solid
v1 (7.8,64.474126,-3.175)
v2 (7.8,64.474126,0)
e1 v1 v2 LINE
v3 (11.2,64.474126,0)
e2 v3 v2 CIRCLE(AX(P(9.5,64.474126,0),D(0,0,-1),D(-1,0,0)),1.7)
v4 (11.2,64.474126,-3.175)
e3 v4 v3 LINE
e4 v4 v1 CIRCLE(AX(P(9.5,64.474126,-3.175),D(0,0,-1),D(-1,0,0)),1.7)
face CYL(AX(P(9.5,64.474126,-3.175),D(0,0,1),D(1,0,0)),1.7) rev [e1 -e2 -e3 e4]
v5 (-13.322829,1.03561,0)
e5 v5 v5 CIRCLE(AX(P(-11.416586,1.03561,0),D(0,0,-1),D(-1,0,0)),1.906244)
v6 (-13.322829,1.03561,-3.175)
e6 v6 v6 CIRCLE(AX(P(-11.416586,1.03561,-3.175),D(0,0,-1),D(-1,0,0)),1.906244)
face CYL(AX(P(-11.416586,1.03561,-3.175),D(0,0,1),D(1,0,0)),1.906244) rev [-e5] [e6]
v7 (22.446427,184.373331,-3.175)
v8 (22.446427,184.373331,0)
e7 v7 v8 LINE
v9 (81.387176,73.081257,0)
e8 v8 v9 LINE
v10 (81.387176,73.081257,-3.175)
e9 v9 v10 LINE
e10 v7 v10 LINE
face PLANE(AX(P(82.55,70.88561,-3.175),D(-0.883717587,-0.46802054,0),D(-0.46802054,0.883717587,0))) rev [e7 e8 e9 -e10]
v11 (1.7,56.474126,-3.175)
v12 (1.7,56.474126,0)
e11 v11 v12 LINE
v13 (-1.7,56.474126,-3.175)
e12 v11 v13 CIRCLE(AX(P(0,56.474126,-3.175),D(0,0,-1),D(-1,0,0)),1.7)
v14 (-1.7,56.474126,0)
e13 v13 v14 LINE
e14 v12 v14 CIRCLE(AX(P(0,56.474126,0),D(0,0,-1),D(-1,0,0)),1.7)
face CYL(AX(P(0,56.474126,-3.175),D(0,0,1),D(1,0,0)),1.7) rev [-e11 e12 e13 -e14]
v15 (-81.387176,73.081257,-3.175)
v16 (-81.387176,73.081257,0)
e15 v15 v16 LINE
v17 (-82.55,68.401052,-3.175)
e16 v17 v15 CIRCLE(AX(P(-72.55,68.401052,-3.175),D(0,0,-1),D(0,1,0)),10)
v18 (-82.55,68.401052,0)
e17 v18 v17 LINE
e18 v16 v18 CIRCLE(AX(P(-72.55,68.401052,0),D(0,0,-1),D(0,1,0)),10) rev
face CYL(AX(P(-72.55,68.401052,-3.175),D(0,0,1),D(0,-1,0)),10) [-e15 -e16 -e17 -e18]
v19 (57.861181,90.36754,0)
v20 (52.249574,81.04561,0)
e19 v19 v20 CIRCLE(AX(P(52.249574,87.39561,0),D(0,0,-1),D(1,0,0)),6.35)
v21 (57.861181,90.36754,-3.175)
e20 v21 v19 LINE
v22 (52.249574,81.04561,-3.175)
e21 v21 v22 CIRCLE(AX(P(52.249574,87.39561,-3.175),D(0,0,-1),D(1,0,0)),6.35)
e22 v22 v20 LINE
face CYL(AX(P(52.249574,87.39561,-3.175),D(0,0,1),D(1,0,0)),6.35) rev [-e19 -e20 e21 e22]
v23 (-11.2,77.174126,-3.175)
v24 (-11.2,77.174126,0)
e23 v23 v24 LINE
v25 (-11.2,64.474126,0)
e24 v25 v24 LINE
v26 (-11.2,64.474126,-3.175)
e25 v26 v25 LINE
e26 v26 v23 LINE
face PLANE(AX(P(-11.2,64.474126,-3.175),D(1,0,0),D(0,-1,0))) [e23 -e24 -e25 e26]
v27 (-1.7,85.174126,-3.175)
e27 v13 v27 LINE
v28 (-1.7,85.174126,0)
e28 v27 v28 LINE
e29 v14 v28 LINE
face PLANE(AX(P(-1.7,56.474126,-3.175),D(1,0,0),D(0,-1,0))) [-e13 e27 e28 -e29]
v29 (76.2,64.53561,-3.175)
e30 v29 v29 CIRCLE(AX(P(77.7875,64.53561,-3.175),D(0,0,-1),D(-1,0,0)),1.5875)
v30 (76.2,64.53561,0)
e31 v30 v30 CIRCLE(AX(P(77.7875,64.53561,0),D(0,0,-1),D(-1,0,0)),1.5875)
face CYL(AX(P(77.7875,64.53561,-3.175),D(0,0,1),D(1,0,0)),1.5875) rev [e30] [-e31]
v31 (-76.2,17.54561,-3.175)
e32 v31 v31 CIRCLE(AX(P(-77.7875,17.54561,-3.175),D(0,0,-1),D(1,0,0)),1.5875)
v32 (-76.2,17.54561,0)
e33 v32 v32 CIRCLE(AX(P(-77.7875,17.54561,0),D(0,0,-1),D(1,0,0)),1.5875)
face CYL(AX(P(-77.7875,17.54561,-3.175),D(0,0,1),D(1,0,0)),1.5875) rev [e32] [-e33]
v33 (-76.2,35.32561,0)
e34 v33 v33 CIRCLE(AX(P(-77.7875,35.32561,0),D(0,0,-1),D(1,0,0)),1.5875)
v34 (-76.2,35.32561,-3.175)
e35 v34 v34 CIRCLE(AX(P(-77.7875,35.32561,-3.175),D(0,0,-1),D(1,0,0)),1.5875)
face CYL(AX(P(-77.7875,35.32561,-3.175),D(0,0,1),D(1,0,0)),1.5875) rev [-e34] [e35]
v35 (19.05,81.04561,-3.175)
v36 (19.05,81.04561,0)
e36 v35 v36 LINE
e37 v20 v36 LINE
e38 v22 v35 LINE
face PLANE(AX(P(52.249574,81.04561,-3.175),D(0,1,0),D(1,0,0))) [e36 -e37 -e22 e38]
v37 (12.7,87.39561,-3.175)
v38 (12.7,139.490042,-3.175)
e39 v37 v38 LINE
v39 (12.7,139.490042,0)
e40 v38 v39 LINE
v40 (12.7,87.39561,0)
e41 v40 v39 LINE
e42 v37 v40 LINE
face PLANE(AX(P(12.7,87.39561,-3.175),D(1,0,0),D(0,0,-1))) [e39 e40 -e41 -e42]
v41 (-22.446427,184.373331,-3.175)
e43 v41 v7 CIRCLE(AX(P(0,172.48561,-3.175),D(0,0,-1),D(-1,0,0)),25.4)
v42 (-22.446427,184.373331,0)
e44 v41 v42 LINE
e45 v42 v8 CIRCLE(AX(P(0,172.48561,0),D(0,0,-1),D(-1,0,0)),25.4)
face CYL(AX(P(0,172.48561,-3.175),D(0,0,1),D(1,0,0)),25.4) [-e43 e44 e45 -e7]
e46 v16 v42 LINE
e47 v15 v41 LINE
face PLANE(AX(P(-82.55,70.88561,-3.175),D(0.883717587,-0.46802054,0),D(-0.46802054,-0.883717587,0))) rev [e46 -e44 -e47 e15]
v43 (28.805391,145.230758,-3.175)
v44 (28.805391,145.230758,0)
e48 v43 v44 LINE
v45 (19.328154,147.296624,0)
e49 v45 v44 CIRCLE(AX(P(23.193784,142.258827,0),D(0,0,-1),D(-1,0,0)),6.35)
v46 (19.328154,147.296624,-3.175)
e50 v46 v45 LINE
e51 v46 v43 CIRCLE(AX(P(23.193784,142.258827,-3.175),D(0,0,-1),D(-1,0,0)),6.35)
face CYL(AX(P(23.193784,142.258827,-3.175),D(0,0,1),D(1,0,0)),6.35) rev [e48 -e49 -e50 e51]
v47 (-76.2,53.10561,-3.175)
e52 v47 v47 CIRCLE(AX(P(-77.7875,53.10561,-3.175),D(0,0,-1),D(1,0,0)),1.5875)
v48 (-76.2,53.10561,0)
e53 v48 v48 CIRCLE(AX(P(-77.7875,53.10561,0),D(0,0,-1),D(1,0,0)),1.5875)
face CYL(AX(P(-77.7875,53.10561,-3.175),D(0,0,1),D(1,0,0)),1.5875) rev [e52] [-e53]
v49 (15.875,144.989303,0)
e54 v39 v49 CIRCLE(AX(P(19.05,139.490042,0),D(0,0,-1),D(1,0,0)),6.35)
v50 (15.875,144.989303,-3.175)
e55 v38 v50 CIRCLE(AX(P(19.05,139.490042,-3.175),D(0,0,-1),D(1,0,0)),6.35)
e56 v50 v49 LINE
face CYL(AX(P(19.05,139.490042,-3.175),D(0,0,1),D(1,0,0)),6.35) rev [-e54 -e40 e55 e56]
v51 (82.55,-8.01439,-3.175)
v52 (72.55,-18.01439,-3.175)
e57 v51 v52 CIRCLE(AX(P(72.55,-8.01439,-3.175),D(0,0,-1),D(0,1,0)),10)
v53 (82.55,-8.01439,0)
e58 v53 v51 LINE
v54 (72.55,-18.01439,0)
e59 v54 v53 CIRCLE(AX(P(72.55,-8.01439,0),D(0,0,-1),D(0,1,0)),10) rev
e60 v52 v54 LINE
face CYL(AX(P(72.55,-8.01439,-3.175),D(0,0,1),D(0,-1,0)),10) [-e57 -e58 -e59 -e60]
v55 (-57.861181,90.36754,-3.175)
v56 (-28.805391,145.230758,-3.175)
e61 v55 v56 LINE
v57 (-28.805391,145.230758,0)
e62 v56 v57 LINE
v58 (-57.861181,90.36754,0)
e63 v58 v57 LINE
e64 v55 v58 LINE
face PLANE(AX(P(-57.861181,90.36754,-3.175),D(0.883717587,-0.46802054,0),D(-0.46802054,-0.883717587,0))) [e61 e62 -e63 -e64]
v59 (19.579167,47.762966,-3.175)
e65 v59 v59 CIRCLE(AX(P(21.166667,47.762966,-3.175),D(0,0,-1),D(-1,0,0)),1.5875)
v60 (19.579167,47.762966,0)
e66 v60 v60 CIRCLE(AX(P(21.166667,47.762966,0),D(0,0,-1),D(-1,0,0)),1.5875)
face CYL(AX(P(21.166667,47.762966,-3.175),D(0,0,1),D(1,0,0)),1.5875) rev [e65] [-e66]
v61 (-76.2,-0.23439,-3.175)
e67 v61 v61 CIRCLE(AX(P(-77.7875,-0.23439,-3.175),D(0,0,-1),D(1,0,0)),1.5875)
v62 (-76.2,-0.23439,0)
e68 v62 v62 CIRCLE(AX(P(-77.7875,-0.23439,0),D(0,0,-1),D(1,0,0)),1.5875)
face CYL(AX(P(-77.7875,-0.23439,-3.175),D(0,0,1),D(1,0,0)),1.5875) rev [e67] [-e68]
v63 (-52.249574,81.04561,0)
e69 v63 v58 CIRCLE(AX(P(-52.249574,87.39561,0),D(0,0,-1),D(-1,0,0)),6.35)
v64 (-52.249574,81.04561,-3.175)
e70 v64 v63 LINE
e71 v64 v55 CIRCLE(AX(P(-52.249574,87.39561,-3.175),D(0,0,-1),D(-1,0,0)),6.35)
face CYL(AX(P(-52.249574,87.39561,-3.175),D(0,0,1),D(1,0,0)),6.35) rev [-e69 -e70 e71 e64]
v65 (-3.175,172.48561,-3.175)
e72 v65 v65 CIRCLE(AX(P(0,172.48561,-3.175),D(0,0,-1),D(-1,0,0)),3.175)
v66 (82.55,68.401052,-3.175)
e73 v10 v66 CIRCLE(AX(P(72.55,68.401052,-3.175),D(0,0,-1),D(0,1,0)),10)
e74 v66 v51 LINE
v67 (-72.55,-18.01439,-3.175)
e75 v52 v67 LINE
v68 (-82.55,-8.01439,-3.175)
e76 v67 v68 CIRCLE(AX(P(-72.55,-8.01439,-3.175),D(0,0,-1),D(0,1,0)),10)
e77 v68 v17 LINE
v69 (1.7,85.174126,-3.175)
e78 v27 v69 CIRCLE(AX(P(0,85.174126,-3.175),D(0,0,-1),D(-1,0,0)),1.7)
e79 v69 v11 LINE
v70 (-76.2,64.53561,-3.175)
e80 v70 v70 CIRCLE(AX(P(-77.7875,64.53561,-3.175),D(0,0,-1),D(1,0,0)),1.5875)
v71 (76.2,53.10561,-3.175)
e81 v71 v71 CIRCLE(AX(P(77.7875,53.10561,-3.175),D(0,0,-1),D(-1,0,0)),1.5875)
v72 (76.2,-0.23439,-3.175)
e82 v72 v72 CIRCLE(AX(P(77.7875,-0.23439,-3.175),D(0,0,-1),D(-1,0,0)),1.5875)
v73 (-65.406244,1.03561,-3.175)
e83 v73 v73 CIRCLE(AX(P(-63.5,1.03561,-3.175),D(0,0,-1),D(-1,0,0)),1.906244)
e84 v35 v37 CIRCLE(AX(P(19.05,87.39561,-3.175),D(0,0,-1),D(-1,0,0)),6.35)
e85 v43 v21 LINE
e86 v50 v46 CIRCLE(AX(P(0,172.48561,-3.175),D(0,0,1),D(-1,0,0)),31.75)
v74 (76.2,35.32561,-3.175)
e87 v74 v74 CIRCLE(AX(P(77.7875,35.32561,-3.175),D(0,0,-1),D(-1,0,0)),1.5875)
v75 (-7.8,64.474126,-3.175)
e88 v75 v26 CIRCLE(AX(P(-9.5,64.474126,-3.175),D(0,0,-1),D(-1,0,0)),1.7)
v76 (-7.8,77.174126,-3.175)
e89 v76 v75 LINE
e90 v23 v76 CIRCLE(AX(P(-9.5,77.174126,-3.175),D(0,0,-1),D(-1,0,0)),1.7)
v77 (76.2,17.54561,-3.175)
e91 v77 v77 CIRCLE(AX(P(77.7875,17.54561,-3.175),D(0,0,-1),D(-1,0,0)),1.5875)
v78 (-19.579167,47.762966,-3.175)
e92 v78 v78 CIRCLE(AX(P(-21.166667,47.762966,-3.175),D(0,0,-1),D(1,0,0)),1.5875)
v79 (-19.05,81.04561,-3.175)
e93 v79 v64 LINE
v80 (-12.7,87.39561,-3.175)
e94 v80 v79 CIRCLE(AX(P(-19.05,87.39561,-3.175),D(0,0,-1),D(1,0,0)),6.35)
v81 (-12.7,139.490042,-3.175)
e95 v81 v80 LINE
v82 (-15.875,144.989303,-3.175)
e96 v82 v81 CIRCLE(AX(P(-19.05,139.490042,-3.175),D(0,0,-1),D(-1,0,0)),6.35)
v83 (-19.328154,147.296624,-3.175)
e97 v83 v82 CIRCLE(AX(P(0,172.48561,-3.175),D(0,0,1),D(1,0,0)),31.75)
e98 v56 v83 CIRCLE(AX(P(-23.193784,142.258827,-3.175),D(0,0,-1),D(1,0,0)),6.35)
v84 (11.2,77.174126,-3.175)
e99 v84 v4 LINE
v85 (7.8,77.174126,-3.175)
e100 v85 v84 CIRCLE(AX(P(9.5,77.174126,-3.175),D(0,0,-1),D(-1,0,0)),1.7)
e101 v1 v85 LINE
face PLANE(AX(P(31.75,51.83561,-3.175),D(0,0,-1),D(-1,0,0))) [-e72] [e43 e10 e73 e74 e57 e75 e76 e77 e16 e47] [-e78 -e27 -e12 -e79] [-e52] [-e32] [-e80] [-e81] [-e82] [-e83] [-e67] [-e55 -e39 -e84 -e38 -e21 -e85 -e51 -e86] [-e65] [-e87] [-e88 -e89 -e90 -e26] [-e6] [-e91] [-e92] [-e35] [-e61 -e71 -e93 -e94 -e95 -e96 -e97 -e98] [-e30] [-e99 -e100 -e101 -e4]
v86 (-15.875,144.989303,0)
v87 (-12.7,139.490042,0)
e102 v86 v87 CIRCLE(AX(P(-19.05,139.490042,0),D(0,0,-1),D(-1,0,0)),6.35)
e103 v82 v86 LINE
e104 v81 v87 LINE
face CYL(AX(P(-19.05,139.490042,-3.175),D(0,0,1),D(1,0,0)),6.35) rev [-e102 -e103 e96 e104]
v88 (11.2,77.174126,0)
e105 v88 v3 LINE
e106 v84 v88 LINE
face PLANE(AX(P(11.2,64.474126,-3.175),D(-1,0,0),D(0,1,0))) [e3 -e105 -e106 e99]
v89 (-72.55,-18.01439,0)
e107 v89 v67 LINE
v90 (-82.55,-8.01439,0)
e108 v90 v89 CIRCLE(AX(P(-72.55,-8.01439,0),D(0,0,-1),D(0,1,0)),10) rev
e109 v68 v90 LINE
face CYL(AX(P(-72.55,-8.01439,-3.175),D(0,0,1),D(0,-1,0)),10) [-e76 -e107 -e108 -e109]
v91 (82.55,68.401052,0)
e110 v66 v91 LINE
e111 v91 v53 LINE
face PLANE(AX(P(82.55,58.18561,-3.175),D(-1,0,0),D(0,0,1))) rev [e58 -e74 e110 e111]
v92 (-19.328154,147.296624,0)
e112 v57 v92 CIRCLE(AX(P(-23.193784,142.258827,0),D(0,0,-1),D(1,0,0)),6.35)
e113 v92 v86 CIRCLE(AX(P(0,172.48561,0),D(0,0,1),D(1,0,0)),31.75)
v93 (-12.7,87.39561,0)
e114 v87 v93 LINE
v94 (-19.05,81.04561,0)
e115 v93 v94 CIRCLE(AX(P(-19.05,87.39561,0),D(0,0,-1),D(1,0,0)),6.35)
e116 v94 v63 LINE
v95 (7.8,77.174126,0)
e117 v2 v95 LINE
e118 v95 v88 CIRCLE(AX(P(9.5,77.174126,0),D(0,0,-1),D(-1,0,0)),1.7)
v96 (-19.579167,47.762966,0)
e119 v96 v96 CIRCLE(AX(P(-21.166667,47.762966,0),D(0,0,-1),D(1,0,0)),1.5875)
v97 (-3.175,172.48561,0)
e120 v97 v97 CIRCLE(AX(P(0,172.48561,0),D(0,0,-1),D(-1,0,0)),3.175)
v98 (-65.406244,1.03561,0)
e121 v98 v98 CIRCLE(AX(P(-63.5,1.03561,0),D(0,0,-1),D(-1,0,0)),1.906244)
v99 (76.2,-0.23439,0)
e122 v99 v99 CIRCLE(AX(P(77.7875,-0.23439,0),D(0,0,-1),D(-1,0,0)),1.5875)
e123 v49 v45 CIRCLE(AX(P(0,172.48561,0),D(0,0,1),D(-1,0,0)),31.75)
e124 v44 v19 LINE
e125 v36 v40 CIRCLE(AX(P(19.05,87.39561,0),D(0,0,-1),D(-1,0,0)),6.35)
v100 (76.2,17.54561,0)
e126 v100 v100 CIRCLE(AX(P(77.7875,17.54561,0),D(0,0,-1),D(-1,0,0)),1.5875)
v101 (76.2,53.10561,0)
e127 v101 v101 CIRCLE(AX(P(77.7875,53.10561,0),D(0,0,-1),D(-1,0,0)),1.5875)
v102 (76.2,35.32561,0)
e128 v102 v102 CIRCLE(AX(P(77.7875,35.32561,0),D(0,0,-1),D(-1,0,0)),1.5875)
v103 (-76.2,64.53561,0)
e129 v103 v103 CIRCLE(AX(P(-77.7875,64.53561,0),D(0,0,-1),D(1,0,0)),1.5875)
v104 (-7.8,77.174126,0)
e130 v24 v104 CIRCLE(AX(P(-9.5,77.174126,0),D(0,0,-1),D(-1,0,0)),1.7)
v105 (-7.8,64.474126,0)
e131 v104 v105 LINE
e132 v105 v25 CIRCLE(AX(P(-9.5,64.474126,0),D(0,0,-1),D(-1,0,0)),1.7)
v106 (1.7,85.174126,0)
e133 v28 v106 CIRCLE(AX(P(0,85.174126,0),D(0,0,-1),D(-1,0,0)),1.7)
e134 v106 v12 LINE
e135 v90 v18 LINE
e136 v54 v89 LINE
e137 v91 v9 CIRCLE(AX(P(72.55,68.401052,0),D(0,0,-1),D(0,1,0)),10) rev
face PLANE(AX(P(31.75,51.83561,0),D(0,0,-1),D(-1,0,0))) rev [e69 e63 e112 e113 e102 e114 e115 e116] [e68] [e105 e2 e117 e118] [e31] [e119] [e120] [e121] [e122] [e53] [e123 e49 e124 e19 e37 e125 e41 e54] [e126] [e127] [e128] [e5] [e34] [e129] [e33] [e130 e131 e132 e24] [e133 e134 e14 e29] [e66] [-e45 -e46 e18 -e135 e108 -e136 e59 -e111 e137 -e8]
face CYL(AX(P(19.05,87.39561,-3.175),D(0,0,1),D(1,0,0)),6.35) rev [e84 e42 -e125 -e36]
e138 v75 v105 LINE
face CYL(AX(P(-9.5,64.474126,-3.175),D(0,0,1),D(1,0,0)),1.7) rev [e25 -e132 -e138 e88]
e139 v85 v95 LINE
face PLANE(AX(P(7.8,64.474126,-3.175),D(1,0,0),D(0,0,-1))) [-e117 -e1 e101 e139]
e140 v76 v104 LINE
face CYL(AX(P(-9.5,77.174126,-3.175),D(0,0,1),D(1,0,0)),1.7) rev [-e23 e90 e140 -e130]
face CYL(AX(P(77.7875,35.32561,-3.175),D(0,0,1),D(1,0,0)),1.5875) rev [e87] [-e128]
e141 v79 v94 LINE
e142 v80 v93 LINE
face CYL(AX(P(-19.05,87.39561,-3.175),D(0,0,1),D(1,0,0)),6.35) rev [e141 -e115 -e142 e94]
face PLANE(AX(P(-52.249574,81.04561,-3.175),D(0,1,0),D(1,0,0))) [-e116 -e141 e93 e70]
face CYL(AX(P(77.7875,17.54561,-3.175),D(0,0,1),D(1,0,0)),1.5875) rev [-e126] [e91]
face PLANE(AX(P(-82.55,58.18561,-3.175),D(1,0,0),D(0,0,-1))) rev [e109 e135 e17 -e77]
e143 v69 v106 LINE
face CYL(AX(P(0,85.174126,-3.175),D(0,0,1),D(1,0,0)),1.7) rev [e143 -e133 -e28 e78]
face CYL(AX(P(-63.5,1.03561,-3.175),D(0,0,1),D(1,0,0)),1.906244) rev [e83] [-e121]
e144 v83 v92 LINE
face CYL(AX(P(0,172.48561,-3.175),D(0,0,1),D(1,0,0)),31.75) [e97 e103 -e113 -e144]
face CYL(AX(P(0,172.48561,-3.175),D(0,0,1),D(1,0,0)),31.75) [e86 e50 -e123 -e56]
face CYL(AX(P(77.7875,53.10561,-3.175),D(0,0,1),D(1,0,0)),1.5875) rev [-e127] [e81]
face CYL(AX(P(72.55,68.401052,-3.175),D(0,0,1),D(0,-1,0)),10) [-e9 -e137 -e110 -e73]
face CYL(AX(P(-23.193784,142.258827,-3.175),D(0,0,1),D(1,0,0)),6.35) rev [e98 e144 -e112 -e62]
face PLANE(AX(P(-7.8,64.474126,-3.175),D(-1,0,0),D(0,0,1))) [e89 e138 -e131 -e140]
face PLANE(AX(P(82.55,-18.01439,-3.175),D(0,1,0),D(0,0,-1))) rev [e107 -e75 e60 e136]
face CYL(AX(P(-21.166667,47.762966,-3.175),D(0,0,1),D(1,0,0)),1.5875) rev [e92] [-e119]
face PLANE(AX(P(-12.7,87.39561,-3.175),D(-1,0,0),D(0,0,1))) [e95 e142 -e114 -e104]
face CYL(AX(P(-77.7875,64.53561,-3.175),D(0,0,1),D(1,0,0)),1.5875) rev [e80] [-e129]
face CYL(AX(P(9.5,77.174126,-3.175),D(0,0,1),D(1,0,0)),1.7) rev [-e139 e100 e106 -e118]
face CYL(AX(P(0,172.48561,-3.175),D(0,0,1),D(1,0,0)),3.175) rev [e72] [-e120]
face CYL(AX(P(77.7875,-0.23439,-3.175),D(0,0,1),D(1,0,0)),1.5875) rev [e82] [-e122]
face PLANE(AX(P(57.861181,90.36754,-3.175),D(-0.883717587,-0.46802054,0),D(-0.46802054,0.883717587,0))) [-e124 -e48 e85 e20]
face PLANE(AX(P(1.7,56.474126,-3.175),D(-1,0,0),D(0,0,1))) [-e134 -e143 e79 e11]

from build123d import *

# Parameters (mm, degrees)
AM_1014_TI_PLATE_BOTTOM_4_AM_0001_ARTEME_START = -3.175
AM_1014_TI_PLATE_BOTTOM_4_AM_0001_AR_2_R       = 1.5875
AM_1014_TI_PLATE_BOTTOM_4_AM_0001_AR_2_R_2     = 1.906243542
AM_1014_TI_PLATE_BOTTOM_4_AM_0001_AR_2_R_3     = 3.175
AM_1014_TI_PLATE_BOTTOM_4_AM_0001_ARTEME_DEPTH = 3.175
BOSS_EXTRUDE1_DEPTH                            = 3.175
FILLET1_R                                      = 10
FILLET2_R                                      = 10


# Read off the part's stored shape, not the designer's step: AM_1014_TI_PLATE_BOTTOM<4>@AM_0001_ARTEMECH
with BuildPart() as part:
    # AM_1014_TI_PLATE_BOTTOM_4_AM_0001_AR 2 → AM_1014_TI_PLATE_BOTTOM<4>@AM_0001_ARTEMECH (new body)
    with BuildSketch(Plane.XY.offset(AM_1014_TI_PLATE_BOTTOM_4_AM_0001_ARTEME_START)):
        with BuildLine():
            Line((-82.55, 70.885609673), (-82.55, -18.014390327))
            Line((-82.55, -18.014390327), (82.55, -18.014390327))
            Line((82.55, -18.014390327), (82.55, 70.885609673))
            Line((82.55, 70.885609673), (22.446426721, 184.373331383))
            ThreePointArc((22.446426721, 184.373331383), (0, 197.885609673), (-22.446426721, 184.373331383))
            Line((-22.446426721, 184.373331383), (-82.55, 70.885609673))
        make_face()
        with Locations((-77.7875, -0.234390327)):
            Circle(AM_1014_TI_PLATE_BOTTOM_4_AM_0001_AR_2_R, mode=Mode.SUBTRACT)
        with Locations((-63.5, 1.035609673)):
            Circle(AM_1014_TI_PLATE_BOTTOM_4_AM_0001_AR_2_R_2, mode=Mode.SUBTRACT)
        with Locations((-77.7875, 17.545609673)):
            Circle(AM_1014_TI_PLATE_BOTTOM_4_AM_0001_AR_2_R, mode=Mode.SUBTRACT)
        with Locations((-77.7875, 35.325609673)):
            Circle(AM_1014_TI_PLATE_BOTTOM_4_AM_0001_AR_2_R, mode=Mode.SUBTRACT)
        with Locations((-11.416585625, 1.035609673)):
            Circle(AM_1014_TI_PLATE_BOTTOM_4_AM_0001_AR_2_R_2, mode=Mode.SUBTRACT)
        with Locations((-77.7875, 53.105609673)):
            Circle(AM_1014_TI_PLATE_BOTTOM_4_AM_0001_AR_2_R, mode=Mode.SUBTRACT)
        with Locations((-77.7875, 64.535609673)):
            Circle(AM_1014_TI_PLATE_BOTTOM_4_AM_0001_AR_2_R, mode=Mode.SUBTRACT)
        with BuildLine():
            Line((-25.4, 42.310609673), (-25.4, 51.835609673))
            ThreePointArc((-25.4, 51.835609673), (-27.25987194, 56.325737733), (-31.75, 58.185609673))
            Line((-31.75, 58.185609673), (-31.651036949, 58.185609673))
            ThreePointArc((-31.651036949, 58.185609673), (-27.160908889, 56.325737733), (-25.301036949, 51.835609673))
            Line((-25.301036949, 51.835609673), (-25.301036949, 42.310609673))
            ThreePointArc((-25.301036949, 42.310609673), (-24.37110098, 40.065545642), (-22.126036949, 39.135609673))
            Line((-22.126036949, 39.135609673), (-22.225, 39.135609673))
            ThreePointArc((-22.225, 39.135609673), (-24.470064031, 40.065545642), (-25.4, 42.310609673))
        make_face(mode=Mode.SUBTRACT)
        with Locations((-21.166666667, 47.762966307)):
            Circle(AM_1014_TI_PLATE_BOTTOM_4_AM_0001_AR_2_R, mode=Mode.SUBTRACT)
        with BuildLine():
            ThreePointArc((-11.2, 77.174125728), (-9.5, 78.874125728), (-7.8, 77.174125728))
            Line((-7.8, 77.174125728), (-7.8, 64.474125728))
            ThreePointArc((-7.8, 64.474125728), (-9.5, 62.774125728), (-11.2, 64.474125728))
            Line((-11.2, 64.474125728), (-11.2, 77.174125728))
        make_face(mode=Mode.SUBTRACT)
        with BuildLine():
            ThreePointArc((-1.7, 85.174125728), (0, 86.874125728), (1.7, 85.174125728))
            Line((1.7, 85.174125728), (1.7, 56.474125728))
            ThreePointArc((1.7, 56.474125728), (0, 54.774125728), (-1.7, 56.474125728))
            Line((-1.7, 56.474125728), (-1.7, 85.174125728))
        make_face(mode=Mode.SUBTRACT)
        with Locations((77.7875, -0.234390327)):
            Circle(AM_1014_TI_PLATE_BOTTOM_4_AM_0001_AR_2_R, mode=Mode.SUBTRACT)
        with Locations((77.7875, 17.545609673)):
            Circle(AM_1014_TI_PLATE_BOTTOM_4_AM_0001_AR_2_R, mode=Mode.SUBTRACT)
        with Locations((77.7875, 35.325609673)):
            Circle(AM_1014_TI_PLATE_BOTTOM_4_AM_0001_AR_2_R, mode=Mode.SUBTRACT)
        with Locations((21.166666667, 47.762966307)):
            Circle(AM_1014_TI_PLATE_BOTTOM_4_AM_0001_AR_2_R, mode=Mode.SUBTRACT)
        with BuildLine():
            ThreePointArc((7.8, 77.174125728), (9.5, 78.874125728), (11.2, 77.174125728))
            Line((11.2, 77.174125728), (11.2, 64.474125728))
            ThreePointArc((11.2, 64.474125728), (9.5, 62.774125728), (7.8, 64.474125728))
            Line((7.8, 64.474125728), (7.8, 77.174125728))
        make_face(mode=Mode.SUBTRACT)
        with Locations((77.7875, 53.105609673)):
            Circle(AM_1014_TI_PLATE_BOTTOM_4_AM_0001_AR_2_R, mode=Mode.SUBTRACT)
        with Locations((77.7875, 64.535609673)):
            Circle(AM_1014_TI_PLATE_BOTTOM_4_AM_0001_AR_2_R, mode=Mode.SUBTRACT)
        with BuildLine():
            ThreePointArc((-28.80539088, 145.230757697), (-24.546211379, 148.463135508), (-19.3281535, 147.296624336))
            ThreePointArc((-19.3281535, 147.296624336), (-17.639343437, 146.086441824), (-15.875, 144.989303103))
            ThreePointArc((-15.875, 144.989303103), (-13.550738686, 142.665041789), (-12.7, 139.490041789))
            Line((-12.7, 139.490041789), (-12.7, 87.395609673))
            ThreePointArc((-12.7, 87.395609673), (-14.559871939, 82.905481612), (-19.05, 81.045609673))
            Line((-19.05, 81.045609673), (-52.249574284, 81.045609673))
            ThreePointArc((-52.249574284, 81.045609673), (-57.689898641, 84.120648468), (-57.861180964, 90.3675401))
            Line((-57.861180964, 90.3675401), (-28.80539088, 145.230757697))
        make_face(mode=Mode.SUBTRACT)
        with Locations((0, 172.485609673)):
            Circle(AM_1014_TI_PLATE_BOTTOM_4_AM_0001_AR_2_R_3, mode=Mode.SUBTRACT)
        with BuildLine():
            ThreePointArc((12.7, 139.490041789), (13.550738686, 142.665041789), (15.875, 144.989303103))
            ThreePointArc((15.875, 144.989303103), (17.639343437, 146.086441824), (19.3281535, 147.296624336))
            ThreePointArc((19.3281535, 147.296624336), (24.546211379, 148.463135508), (28.80539088, 145.230757697))
            Line((28.80539088, 145.230757697), (57.861180964, 90.3675401))
            ThreePointArc((57.861180964, 90.3675401), (57.689898641, 84.120648468), (52.249574284, 81.045609673))
            Line((52.249574284, 81.045609673), (19.05, 81.045609673))
            ThreePointArc((19.05, 81.045609673), (14.559871939, 82.905481612), (12.7, 87.395609673))
            Line((12.7, 87.395609673), (12.7, 139.490041789))
        make_face(mode=Mode.SUBTRACT)
    extrude(amount=AM_1014_TI_PLATE_BOTTOM_4_AM_0001_ARTEME_DEPTH)

    # Sketch2 → Boss-Extrude1 (add)
    with BuildSketch(Plane.XY):
        Polygon((-34.947413532, 60.439294241), (-28.081020706, 36.459737757), (-19.207528438, 36.459737757), (-20.497701901, 40.965420465), (-23.644274572, 43.537404208), (-23.644274572, 54.206722292), (-24.602914342, 57.554587336), (-28.081020706, 60.39756411), align=None)
    extrude(amount=-BOSS_EXTRUDE1_DEPTH)

    # Fillet1
    fillet1_edges = [part.edges().sort_by_distance(p)[0] for p in [
        (-82.55, -18.014390327, -1.5875),
        (82.55, -18.014390327, -1.5875),
    ]]
    fillet(fillet1_edges, radius=FILLET1_R)

    # Fillet2
    fillet2_edges = [part.edges().sort_by_distance(p)[0] for p in [
        (82.55, 70.885609673, -1.5875),
        (-82.55, 70.885609673, -1.5875),
    ]]
    fillet(fillet2_edges, radius=FILLET2_R)


solid = part.part
